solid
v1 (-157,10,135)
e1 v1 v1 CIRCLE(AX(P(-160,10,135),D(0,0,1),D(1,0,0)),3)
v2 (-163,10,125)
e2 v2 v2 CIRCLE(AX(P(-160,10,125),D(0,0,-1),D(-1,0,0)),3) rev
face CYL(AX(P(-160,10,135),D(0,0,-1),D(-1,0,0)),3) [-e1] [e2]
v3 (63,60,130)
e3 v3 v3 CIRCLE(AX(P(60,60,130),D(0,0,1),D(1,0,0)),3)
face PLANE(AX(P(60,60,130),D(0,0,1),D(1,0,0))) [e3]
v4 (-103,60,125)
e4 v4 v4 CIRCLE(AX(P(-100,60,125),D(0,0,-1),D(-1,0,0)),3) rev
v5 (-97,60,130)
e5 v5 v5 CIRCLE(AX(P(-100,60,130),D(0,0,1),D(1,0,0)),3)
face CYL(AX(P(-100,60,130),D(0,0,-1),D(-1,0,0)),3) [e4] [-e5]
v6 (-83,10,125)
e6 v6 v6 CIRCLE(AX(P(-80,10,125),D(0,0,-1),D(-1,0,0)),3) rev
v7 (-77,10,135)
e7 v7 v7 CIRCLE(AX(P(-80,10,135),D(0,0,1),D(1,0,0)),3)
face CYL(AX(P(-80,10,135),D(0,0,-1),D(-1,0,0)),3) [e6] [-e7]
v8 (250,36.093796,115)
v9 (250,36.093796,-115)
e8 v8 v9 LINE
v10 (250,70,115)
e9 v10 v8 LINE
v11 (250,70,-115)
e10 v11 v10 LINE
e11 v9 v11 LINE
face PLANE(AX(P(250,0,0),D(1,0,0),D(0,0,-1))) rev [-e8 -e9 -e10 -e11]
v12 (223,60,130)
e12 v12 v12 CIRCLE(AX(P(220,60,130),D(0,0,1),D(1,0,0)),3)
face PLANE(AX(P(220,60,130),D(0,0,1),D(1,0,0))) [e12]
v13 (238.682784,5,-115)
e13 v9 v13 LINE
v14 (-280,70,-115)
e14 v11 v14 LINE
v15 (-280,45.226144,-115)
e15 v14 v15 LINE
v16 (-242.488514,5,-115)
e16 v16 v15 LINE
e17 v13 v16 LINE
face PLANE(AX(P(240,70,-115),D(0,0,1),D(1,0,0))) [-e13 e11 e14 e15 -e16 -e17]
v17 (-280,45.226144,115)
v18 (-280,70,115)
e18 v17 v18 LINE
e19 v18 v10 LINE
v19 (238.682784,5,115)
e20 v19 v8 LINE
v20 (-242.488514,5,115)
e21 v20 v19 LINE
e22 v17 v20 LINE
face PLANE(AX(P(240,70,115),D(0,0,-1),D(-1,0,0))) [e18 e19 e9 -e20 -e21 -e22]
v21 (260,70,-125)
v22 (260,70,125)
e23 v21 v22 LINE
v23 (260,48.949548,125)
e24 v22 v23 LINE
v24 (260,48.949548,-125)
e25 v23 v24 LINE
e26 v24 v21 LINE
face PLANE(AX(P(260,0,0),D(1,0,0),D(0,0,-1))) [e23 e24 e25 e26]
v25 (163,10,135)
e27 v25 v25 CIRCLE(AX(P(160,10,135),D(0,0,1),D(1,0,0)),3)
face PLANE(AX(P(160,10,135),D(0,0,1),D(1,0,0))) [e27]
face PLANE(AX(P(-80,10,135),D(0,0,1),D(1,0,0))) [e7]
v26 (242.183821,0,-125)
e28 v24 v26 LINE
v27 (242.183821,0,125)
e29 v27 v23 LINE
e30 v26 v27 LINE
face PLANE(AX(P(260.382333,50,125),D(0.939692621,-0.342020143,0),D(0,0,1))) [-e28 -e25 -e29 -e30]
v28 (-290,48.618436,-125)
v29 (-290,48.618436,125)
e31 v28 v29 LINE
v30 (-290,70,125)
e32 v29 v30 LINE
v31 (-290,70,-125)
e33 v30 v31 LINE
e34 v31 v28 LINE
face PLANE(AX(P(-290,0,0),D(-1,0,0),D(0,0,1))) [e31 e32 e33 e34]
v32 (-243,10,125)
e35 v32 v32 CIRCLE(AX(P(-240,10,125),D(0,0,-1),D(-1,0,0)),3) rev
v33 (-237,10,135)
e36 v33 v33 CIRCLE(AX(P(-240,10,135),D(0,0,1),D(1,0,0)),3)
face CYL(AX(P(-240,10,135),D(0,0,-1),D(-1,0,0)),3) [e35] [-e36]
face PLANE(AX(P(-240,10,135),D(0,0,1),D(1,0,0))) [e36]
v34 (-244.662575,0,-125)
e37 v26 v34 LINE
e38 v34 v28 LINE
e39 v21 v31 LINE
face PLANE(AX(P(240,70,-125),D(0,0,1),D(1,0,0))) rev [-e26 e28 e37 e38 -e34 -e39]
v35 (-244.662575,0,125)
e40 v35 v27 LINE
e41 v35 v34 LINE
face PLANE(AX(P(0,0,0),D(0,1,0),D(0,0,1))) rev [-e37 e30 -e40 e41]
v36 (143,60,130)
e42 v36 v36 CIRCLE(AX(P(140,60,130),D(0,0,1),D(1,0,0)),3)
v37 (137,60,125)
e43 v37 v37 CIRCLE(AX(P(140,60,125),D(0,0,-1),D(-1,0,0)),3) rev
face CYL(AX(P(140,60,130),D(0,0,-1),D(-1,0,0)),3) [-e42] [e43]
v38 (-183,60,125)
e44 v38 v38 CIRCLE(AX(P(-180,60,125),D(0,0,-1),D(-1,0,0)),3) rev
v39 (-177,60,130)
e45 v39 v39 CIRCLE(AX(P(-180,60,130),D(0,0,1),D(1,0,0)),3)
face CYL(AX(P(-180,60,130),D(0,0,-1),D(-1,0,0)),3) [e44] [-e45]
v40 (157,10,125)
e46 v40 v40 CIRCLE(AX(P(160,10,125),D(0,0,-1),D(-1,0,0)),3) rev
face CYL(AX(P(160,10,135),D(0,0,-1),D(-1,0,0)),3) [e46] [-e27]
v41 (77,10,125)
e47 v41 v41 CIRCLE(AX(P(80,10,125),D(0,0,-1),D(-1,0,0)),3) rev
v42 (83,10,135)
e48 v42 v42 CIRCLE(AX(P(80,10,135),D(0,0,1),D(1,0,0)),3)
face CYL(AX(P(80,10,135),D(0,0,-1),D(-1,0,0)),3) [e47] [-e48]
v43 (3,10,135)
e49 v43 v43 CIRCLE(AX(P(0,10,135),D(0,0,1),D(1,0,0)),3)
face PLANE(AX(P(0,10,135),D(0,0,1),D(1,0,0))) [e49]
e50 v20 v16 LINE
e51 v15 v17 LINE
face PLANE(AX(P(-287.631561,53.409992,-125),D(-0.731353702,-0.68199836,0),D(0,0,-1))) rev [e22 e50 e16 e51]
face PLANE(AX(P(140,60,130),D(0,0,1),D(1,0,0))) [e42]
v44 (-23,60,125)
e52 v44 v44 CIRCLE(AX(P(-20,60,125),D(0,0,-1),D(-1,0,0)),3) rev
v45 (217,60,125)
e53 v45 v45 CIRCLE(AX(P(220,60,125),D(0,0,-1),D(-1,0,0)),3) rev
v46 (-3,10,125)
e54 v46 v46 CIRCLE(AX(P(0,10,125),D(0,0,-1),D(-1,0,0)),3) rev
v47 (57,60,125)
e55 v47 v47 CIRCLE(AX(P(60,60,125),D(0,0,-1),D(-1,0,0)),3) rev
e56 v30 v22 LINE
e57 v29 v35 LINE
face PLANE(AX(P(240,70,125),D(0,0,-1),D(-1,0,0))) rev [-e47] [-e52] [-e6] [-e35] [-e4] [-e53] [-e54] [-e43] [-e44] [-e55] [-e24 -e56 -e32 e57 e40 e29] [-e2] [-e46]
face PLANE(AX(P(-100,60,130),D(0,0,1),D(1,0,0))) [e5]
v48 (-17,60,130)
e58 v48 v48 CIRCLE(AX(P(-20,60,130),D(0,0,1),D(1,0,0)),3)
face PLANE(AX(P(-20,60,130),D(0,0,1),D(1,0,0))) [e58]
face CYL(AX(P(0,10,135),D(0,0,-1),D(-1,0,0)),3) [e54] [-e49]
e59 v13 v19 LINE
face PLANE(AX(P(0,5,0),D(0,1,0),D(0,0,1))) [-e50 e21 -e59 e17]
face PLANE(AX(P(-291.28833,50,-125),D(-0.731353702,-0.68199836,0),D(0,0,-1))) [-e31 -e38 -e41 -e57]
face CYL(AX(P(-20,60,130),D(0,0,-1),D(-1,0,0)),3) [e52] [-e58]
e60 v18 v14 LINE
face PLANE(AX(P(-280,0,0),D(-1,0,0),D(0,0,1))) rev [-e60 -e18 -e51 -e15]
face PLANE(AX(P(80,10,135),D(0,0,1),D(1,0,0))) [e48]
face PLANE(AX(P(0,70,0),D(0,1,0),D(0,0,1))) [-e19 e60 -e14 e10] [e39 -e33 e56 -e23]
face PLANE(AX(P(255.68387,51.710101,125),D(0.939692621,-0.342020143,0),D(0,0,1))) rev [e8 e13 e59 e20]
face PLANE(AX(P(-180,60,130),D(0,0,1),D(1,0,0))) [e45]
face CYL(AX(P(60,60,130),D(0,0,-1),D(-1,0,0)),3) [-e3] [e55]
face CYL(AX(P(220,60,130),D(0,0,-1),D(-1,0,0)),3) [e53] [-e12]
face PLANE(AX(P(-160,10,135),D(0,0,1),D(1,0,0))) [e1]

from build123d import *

# Parameters (mm, degrees)
SKETCH1_W           = 480
SKETCH1_H           = 250
BOSS_EXTRUDE1_DEPTH = 70
SKETCH2_W           = 250
SKETCH2_H           = 20
BOSS_EXTRUDE2_DEPTH = 50
CHAMFER1_SIZE       = 55
CHAMFER1_SIZE_2     = 51.288329738
SKETCH3_W           = 250
SKETCH3_H           = 20
BOSS_EXTRUDE3_DEPTH = 20
CHAMFER3_SIZE       = 56
CHAMFER3_SIZE_2     = 20.382333119
SHELL1_START        = -115
SHELL1_DEPTH        = 230
SKETCH4_R           = 3
BOSS_EXTRUDE4_DEPTH = 5
SKETCH6_R           = 3
BOSS_EXTRUDE5_DEPTH = 10


# Read off the part's stored shape, not the designer's step: Shell1
with BuildPart() as part:
    # Sketch1 → Boss-Extrude1 (new body)
    with BuildSketch(Plane(origin=(0, 0, 0), x_dir=(1, 0, 0), z_dir=(0, 1, 0))):
        Rectangle(SKETCH1_W, SKETCH1_H)
    extrude(amount=BOSS_EXTRUDE1_DEPTH)

    # Sketch2 → Boss-Extrude2 (add)
    with BuildSketch(Plane.ZY.offset(240)):
        with Locations((0, 60)):
            Rectangle(SKETCH2_W, SKETCH2_H)
    extrude(amount=BOSS_EXTRUDE2_DEPTH)

    # Chamfer1
    # the kernel refuses this chamfer: 55, 51.288329738 mm, written as the material it adds along each edge
    with BuildSketch(Plane(origin=(-240, 50, 125), x_dir=(0.02649526118620358, -0.9996489389454054, 0), z_dir=(0, 0, -1))) as chamfer1_piece_1_section:
        Polygon((CHAMFER1_SIZE * 0.999648938945, CHAMFER1_SIZE * 0.0264952611862), (-CHAMFER1_SIZE_2 * 0.026495261186, CHAMFER1_SIZE_2 * 0.999648938937), (0, 0), align=None)
    chamfer1_piece_1 = extrude(amount=250, mode=Mode.PRIVATE)
    chamfer1_piece_1 = split(chamfer1_piece_1, bisect_by=Plane(origin=(-257.002695591, 0, 0), z_dir=(0, 1, 0)), keep=Keep.TOP, mode=Mode.PRIVATE)
    chamfer1_piece_1 = split(chamfer1_piece_1, bisect_by=Plane(origin=(-290, 32.326466584, 0), z_dir=(1, 0, 0)), keep=Keep.TOP, mode=Mode.PRIVATE)
    add(chamfer1_piece_1)

    # Sketch3 → Boss-Extrude3 (add)
    with BuildSketch(Plane(origin=(240, 0, 0), x_dir=(0, 0, -1), z_dir=(1, 0, 0))):
        with Locations((0, 60)):
            Rectangle(SKETCH3_W, SKETCH3_H)
    extrude(amount=BOSS_EXTRUDE3_DEPTH)

    # Chamfer3
    # the kernel refuses this chamfer: 56, 20.382333119 mm, written as the material it adds along each edge
    with BuildSketch(Plane(origin=(240, 50, -125), x_dir=(-0.013184058198645885, -0.9999130865277316, 0), z_dir=(0, 0, 1))) as chamfer3_piece_1_section:
        Polygon((CHAMFER3_SIZE * 0.999913086528, CHAMFER3_SIZE * 0.0131840581986), (-CHAMFER3_SIZE_2 * 0.0131840581986, CHAMFER3_SIZE_2 * 0.999913086523), (0, 0), align=None)
    chamfer3_piece_1 = extrude(amount=250, mode=Mode.PRIVATE)
    chamfer3_piece_1 = split(chamfer3_piece_1, bisect_by=Plane(origin=(246.40635993, 0, 0), z_dir=(0, 1, 0)), keep=Keep.TOP, mode=Mode.PRIVATE)
    chamfer3_piece_1 = split(chamfer3_piece_1, bisect_by=Plane(origin=(260, 31.786057297, 0), z_dir=(-1, 0, 0)), keep=Keep.TOP, mode=Mode.PRIVATE)
    add(chamfer3_piece_1)

    # Shell1 outline → Shell1 (cut)
    with BuildSketch(Plane.XY.offset(SHELL1_START)):
        Polygon((-242.488513556, 5), (238.682783715, 5), (250, 36.093796195), (250, 70), (-280, 70), (-280, 45.226144329), align=None)
    extrude(amount=SHELL1_DEPTH, mode=Mode.SUBTRACT)

    # Sketch4 → Boss-Extrude4 (add)
    with BuildSketch(Plane.XY.offset(125)):
        with Locations(Location((220, 60, 0), (0, 0, 180))):
            Circle(SKETCH4_R)
        with Locations(Location((140, 60, 0), (0, 0, 180))):
            Circle(SKETCH4_R)
        with Locations(Location((60, 60, 0), (0, 0, 180))):
            Circle(SKETCH4_R)
        with Locations(Location((-20, 60, 0), (0, 0, 180))):
            Circle(SKETCH4_R)
        with Locations(Location((-100, 60, 0), (0, 0, 180))):
            Circle(SKETCH4_R)
        with Locations(Location((-180, 60, 0), (0, 0, 180))):
            Circle(SKETCH4_R)
    extrude(amount=BOSS_EXTRUDE4_DEPTH)

    # Sketch6 → Boss-Extrude5 (add)
    with BuildSketch(Plane.XY.offset(125)):
        with Locations(Location((160, 10, 0), (0, 0, 180))):
            Circle(SKETCH6_R)
        with Locations(Location((80, 10, 0), (0, 0, 180))):
            Circle(SKETCH6_R)
        with Locations(Location((0, 10, 0), (0, 0, 180))):
            Circle(SKETCH6_R)
        with Locations(Location((-80, 10, 0), (0, 0, 180))):
            Circle(SKETCH6_R)
        with Locations(Location((-160, 10, 0), (0, 0, 180))):
            Circle(SKETCH6_R)
        with Locations(Location((-240, 10, 0), (0, 0, 180))):
            Circle(SKETCH6_R)
    extrude(amount=BOSS_EXTRUDE5_DEPTH)


solid = part.part
